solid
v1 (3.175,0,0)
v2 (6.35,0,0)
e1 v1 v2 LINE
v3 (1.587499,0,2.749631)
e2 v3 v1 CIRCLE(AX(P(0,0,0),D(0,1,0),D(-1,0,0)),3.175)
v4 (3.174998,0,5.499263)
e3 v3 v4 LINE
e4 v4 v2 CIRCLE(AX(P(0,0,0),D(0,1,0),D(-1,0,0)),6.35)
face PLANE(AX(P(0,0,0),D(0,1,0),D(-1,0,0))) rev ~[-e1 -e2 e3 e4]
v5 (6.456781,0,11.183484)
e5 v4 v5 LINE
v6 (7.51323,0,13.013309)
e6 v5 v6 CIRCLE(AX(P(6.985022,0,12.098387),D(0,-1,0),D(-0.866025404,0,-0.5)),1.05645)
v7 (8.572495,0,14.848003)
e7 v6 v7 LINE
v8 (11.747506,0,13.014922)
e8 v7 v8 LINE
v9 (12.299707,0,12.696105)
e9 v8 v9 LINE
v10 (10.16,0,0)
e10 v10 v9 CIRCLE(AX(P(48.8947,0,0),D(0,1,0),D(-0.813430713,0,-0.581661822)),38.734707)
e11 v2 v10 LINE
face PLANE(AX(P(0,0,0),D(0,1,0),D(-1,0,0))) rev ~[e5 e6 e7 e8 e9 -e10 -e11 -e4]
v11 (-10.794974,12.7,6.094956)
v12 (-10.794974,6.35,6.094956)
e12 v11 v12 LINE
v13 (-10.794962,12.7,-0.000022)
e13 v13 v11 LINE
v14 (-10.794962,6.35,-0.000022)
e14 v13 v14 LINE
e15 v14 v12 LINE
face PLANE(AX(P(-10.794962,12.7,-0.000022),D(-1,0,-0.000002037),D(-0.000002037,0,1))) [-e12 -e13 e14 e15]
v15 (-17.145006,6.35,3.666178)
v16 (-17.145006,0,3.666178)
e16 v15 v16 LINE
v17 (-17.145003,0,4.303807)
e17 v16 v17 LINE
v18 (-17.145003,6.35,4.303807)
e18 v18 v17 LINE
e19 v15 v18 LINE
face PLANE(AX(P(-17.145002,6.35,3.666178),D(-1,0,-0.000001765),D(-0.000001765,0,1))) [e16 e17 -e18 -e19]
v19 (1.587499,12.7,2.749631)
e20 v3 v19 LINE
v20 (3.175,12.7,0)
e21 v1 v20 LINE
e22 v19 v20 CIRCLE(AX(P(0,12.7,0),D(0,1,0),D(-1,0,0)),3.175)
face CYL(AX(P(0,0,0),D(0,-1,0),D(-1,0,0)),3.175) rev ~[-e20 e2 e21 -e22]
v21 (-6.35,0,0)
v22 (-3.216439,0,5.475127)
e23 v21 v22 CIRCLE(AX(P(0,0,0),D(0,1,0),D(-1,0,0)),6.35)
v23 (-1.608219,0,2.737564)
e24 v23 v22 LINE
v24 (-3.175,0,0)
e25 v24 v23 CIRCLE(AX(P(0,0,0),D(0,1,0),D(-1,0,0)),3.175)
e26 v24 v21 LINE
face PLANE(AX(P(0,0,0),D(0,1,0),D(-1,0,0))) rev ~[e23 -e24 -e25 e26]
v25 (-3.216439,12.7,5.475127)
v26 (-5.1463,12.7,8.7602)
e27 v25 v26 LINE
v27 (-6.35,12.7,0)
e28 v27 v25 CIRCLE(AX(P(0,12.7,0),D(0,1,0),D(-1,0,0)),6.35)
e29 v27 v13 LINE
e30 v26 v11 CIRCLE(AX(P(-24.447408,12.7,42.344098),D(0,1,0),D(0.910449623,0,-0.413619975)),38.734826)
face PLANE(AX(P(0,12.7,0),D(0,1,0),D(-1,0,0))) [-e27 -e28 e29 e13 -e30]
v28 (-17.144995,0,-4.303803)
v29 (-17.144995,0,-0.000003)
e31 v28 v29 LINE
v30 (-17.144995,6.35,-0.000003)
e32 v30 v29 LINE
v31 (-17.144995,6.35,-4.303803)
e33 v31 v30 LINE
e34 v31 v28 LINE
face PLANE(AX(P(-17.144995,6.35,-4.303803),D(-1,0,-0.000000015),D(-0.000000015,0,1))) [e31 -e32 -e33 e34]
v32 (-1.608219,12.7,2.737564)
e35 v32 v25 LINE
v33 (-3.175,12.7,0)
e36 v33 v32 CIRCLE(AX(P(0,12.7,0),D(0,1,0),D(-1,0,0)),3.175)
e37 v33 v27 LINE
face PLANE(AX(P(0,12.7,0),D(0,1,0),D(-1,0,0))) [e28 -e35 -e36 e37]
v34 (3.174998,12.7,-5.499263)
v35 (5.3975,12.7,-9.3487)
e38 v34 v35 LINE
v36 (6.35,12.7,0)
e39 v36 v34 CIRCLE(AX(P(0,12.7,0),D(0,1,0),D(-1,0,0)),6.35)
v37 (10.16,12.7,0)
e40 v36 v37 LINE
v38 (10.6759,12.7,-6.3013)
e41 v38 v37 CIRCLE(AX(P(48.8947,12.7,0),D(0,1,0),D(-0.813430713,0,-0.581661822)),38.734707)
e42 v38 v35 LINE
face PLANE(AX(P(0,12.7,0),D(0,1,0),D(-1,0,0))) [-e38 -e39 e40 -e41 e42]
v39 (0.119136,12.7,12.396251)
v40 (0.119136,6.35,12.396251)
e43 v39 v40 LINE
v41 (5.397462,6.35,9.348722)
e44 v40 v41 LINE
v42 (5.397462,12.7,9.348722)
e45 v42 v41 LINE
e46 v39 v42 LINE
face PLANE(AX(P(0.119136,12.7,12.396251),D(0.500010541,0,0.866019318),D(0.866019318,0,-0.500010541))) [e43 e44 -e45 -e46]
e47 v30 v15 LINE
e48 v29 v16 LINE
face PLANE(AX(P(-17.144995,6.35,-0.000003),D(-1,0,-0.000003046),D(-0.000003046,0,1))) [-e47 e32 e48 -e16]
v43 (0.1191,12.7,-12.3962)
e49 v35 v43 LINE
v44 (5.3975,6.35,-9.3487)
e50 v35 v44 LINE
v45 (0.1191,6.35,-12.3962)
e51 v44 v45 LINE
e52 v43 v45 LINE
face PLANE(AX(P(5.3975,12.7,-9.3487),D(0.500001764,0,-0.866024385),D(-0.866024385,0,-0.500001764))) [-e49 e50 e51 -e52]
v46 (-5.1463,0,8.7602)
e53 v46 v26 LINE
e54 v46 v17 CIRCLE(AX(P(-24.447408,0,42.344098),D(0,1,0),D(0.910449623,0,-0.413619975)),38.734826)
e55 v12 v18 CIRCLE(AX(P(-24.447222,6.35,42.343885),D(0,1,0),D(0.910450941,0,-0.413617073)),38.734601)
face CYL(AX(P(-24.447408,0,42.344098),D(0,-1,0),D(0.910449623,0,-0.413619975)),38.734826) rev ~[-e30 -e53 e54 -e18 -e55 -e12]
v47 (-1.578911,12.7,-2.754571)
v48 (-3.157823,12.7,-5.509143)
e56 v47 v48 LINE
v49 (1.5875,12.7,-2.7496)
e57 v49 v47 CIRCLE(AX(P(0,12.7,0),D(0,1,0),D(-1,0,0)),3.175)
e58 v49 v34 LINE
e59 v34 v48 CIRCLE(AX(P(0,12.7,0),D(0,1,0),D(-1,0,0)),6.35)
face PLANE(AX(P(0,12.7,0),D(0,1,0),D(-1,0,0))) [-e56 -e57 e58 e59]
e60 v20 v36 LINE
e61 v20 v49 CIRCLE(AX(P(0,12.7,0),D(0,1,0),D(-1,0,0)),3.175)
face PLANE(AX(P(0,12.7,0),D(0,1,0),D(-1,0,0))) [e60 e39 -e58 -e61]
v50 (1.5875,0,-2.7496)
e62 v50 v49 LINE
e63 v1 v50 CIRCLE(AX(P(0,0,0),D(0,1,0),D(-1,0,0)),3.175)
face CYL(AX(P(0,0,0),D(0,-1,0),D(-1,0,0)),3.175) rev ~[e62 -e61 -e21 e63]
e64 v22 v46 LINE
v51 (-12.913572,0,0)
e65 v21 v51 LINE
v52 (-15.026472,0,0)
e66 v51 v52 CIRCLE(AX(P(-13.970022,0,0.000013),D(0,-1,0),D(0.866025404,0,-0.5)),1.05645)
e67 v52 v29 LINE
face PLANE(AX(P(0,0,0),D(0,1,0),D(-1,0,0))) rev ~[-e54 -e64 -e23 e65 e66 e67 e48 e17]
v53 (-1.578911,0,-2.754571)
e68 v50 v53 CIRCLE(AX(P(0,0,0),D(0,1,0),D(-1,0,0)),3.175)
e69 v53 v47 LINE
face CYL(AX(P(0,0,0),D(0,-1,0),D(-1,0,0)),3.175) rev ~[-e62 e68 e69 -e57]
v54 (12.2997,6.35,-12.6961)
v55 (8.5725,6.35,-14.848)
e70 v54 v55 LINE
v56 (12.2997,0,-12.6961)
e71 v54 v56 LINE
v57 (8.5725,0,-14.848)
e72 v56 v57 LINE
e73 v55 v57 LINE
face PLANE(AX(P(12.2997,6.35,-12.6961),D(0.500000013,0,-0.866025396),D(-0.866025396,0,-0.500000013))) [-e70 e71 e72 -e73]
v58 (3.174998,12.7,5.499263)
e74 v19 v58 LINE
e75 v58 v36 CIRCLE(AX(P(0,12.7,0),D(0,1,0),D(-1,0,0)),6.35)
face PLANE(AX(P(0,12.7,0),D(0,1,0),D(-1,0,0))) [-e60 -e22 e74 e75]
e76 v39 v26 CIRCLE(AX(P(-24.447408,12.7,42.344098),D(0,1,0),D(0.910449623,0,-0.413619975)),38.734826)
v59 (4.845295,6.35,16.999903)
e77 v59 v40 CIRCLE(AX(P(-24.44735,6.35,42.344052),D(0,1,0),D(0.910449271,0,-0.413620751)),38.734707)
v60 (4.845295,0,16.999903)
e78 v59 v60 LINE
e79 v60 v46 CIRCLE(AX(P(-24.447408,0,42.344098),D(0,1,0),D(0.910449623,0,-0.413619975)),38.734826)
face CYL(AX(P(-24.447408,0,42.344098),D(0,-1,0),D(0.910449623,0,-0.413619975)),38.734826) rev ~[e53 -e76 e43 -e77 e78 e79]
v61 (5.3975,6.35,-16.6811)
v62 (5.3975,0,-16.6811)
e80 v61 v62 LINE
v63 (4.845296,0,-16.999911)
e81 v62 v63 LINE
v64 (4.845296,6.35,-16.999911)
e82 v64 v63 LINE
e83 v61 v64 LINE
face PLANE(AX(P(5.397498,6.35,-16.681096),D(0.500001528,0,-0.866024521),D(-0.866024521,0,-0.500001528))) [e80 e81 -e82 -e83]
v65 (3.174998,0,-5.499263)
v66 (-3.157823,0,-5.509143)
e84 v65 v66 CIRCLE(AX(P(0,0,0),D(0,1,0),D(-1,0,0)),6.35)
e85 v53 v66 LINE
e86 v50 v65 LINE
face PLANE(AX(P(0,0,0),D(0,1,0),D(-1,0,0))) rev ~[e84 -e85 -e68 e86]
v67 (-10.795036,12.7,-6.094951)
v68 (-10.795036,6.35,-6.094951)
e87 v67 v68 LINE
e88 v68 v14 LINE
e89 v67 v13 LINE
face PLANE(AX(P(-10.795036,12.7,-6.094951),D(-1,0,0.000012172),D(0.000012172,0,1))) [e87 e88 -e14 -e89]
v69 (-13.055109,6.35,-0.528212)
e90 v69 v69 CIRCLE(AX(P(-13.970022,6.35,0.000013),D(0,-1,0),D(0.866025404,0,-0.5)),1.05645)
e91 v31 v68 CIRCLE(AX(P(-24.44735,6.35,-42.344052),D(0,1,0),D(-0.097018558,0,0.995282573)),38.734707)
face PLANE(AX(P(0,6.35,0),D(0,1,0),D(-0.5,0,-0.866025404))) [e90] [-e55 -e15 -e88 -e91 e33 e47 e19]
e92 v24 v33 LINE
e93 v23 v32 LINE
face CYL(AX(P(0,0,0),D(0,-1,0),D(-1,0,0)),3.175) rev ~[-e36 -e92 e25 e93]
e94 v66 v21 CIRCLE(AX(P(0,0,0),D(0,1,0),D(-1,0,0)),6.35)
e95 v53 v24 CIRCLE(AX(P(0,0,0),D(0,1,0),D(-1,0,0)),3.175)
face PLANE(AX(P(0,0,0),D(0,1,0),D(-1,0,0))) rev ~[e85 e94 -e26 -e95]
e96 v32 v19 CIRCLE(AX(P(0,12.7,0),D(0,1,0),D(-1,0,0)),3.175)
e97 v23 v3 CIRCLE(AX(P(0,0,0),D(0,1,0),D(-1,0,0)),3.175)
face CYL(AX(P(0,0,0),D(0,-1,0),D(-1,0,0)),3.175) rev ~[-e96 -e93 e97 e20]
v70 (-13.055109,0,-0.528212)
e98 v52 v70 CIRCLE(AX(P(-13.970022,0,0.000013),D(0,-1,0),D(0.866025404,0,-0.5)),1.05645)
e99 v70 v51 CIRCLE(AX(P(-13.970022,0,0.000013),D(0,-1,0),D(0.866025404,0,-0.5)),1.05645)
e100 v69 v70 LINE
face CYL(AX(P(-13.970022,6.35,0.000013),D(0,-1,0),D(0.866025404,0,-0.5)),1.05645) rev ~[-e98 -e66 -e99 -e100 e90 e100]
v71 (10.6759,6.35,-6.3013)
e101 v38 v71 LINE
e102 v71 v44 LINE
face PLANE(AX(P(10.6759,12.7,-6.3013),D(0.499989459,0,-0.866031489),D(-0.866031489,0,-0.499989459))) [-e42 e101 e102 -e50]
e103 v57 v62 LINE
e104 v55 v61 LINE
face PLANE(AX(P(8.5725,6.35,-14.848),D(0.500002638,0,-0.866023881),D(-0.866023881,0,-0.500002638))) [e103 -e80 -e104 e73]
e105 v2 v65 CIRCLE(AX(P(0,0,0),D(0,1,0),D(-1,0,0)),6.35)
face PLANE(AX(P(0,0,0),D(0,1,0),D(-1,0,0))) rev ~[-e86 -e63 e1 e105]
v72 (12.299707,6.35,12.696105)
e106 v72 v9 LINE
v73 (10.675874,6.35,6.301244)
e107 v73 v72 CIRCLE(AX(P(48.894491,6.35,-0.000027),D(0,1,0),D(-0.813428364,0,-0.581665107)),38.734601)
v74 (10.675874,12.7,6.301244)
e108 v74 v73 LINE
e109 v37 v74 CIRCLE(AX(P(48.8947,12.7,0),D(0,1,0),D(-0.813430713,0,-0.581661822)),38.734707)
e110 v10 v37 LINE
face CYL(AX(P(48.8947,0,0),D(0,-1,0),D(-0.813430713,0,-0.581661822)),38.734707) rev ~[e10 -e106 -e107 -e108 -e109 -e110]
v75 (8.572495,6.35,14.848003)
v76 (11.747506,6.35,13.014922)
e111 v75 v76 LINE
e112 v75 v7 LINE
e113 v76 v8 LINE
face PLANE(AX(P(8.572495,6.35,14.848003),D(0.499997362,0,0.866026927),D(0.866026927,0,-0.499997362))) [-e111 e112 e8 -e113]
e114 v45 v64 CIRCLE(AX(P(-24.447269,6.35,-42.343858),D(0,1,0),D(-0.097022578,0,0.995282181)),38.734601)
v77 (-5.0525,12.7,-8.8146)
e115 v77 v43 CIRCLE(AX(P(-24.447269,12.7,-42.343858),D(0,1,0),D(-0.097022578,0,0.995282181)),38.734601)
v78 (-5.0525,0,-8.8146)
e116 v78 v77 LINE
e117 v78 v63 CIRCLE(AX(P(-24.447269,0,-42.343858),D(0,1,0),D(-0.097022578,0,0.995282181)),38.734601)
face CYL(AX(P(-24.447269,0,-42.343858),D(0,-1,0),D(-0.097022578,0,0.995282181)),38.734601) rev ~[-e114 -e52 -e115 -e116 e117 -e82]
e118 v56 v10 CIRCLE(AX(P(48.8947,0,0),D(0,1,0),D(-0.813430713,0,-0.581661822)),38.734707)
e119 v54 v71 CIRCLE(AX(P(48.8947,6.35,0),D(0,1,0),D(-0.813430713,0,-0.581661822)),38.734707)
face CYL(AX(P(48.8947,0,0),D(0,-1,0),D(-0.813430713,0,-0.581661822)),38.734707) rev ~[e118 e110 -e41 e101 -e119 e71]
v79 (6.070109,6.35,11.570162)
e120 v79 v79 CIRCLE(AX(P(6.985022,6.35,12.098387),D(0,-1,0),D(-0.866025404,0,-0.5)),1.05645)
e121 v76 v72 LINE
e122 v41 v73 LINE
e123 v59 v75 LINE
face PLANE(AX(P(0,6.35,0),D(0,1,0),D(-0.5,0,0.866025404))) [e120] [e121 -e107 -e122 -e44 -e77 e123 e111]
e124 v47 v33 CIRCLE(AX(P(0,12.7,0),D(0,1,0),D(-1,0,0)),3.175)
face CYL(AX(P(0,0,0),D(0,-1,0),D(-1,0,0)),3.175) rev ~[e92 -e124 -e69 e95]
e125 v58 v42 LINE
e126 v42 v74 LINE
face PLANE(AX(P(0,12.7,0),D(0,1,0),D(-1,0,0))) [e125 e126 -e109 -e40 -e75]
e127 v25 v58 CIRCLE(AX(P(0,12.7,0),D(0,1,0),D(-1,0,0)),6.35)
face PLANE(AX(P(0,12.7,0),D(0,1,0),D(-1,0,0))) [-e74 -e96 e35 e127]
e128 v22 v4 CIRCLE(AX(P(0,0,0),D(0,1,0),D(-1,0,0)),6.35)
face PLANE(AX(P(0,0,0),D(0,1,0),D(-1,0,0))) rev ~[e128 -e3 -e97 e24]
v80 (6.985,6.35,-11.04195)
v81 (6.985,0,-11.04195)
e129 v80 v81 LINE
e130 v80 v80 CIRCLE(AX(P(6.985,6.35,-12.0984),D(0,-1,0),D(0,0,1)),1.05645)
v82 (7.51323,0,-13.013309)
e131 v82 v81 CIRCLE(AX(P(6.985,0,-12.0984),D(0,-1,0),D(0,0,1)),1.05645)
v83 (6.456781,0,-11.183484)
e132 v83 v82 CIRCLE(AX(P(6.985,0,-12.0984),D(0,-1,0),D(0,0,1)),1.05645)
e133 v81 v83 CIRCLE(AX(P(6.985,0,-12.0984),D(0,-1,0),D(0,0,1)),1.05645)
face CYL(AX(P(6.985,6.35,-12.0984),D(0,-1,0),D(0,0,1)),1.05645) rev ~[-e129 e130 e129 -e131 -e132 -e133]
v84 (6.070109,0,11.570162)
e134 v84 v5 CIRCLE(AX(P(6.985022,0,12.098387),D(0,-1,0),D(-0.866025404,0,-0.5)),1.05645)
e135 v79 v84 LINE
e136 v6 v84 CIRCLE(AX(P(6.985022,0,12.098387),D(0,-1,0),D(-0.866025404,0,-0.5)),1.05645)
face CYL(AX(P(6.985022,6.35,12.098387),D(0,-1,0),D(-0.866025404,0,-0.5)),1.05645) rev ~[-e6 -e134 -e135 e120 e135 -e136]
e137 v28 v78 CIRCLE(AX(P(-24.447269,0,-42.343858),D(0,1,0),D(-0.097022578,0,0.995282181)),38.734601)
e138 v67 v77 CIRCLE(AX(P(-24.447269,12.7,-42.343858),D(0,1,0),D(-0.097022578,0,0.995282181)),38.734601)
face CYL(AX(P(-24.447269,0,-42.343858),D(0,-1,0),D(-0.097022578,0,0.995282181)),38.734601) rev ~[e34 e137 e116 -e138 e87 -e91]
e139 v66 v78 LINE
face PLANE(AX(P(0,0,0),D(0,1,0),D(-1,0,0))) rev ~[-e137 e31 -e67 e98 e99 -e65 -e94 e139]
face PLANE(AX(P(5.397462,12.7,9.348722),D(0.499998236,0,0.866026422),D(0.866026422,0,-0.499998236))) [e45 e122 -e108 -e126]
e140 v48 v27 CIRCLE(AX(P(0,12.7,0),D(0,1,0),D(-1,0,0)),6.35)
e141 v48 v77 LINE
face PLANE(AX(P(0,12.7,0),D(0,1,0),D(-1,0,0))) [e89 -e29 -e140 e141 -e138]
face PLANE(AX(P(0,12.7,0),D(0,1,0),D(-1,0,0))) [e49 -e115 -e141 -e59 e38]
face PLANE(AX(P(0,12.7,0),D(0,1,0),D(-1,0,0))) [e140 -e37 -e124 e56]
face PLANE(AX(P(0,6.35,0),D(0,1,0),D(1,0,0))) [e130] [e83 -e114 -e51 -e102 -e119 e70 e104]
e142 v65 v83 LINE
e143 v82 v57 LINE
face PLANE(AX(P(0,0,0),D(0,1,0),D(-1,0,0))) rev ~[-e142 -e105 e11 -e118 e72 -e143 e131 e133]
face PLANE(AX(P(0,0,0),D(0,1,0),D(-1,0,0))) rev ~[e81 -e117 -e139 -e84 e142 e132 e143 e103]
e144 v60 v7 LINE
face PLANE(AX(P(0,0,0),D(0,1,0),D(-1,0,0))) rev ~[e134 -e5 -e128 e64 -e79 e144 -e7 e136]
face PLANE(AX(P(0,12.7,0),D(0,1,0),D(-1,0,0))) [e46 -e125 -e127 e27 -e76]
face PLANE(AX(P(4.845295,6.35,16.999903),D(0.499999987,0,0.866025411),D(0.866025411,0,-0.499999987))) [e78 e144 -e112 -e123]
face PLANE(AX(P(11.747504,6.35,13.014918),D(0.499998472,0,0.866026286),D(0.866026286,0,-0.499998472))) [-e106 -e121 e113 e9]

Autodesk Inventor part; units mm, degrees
ref_plane "YZ Plane" through (0, 0, 0) normal (1, 0, 0) x (0, 1, 0)
ref_plane "XZ Plane" through (0, 0, 0) normal (0, 1, 0) x (-1, 0, 0)
ref_plane "XY Plane" through (0, 0, 0) normal (0, 0, 1) x (1, 0, 0)
sketch "Sketch1" plane through (0, 0, 0) normal (0, 1, 0) x (-1, 0, 0)
  line L0 (0, 0) -> (28.575, 0)
  line L1 (28.575, 0) -> (0, 0)
  line L2 (0, 0) -> (-14.2875, -24.7467)
  line L3 (0, 0) -> (28.575, 0) construction
  line L4 (0, 0) -> (-14.2875, 24.7467)
  line L5 (0, 0) -> (28.575, 0) construction
  circle A0 centre (28.575, 0) radius 2.54
  circle A1 centre (-14.2875, -24.7467) radius 2.54
  circle A2 centre (-14.2875, 24.7467) radius 2.54
  circle A3 centre (0, 0) radius 3.175
  circle A4 centre (0, 0) radius 6.35
  line L6 (-1.5875, -2.7496) -> (0, 0)
  line L7 (0, 0) -> (-6.35, 0)
  circle A5 centre (-14.2875, 24.7467) radius 3.81
  circle A6 centre (28.575, 0) radius 3.81
  circle A7 centre (-14.2875, -24.7467) radius 3.81
  line L8 (30.6811, 3.175) -> (-12.1814, 27.9217)
  line L9 (28.2054, -3.792) -> (-10.8187, -26.3226)
  line L10 (-18.0975, 24.7467) -> (-18.0975, -24.7467)
  line L11 (0, 0) -> (5.0525, -8.8146)
  line L12 (0, 0) -> (5.1463, 8.7602)
  line L13 (0, 0) -> (-10.16, 0)
  arc A8 (28.2054, -3.792) -> (-10.8187, -26.3226) centre (24.4473, -42.344) ccw
  arc A9 (-10.8187, 26.3226) -> (28.2054, 3.792) centre (24.4473, 42.344) ccw
  arc A10 (-17.3867, -22.5305) -> (-17.3867, 22.5305) centre (-48.8947, 0) ccw
  point P0 (5.1074, 8.7829)
  point P1 (-10.16, 0.0317)
  point P2 (30.2716, 3.4114)
  point P3 (28.2054, 3.792)
  point P4 (-10.8187, 26.3226)
  point P5 (-17.3867, 22.5305)
  point P6 (-17.3867, -22.5305)
  dimension "d9" = 6.35
  dimension "d41" = 12.7
  dimension "d0" = 28.575
  dimension "d1" = 28.575
  dimension "d2" = 120
  dimension "d3" = 28.575
  dimension "d4" = 120
  dimension "d5" = 5.08
  dimension "d6" = 5.08
  dimension "d7" = 5.08
  dimension "d42" = 7.62
  dimension "d43" = 7.62
  dimension "d44" = 7.62
  dimension "d47" = 10.16
  dimension "d48" = 10.16
  dimension "d49" = 10.16
  dimension "d52" = 360
extrude "Extrusion4" add sketch "Sketch1" along normal blind 12.7 contours A3 L12 A4 L0 | L0 A4 L11 A3 | A3 L11 A4 L2 | L2 A4 L7 A3 | A3 L7 A4 L4 | L4 A4 L12 A3 | A4 L12 A9 A6 L0 | L0 A6 A8 L11 A4 | A4 L11 A8 A7 L2 | L2 A7 A10 L13 A4 | A4 L13 A10 A5 L4 | L4 A5 A9 L12 A4 | A6 L8 | A7 | A5 picked at (31.8987, 0.5122)
sketch "Sketch19" plane through (0, 12.7, 0) normal (0, 1, 0) x (1, 0, 0)
  arc A0 (17.3867, 22.5305) -> (10.8187, 26.3226) centre (14.2875, 24.7467) ccw projected
  line L0 (5.3975, 9.3487) -> (0.1191, 12.3962) projected
  arc A1 (-28.2054, 3.792) -> (10.8187, 26.3226) centre (-24.4473, 42.344) ccw projected
  arc A2 (-28.2054, 3.792) -> (-30.6811, -3.175) centre (-28.575, 0) ccw projected
  line L1 (-30.6811, -3.175) -> (-30.2716, -3.4114) projected
  arc A3 (-30.2716, -3.4114) -> (-28.2054, -3.792) centre (-28.575, 0) ccw projected
  arc A4 (10.8187, -26.3226) -> (-28.2054, -3.792) centre (-24.4473, -42.344) ccw projected
  arc A5 (10.8187, -26.3226) -> (17.3867, -22.5305) centre (14.2875, -24.7467) ccw projected
  arc A6 (17.3867, 22.5305) -> (17.3867, -22.5305) centre (48.8947, 0) ccw projected
  arc A7 (17.3867, 22.5305) -> (10.8187, 26.3226) centre (14.2875, 24.7467) ccw projected
  circle A8 centre (-28.575, 0) radius 2.54 projected
  circle A9 centre (0, 0) radius 3.175 projected
  circle A10 centre (14.2875, -24.7467) radius 2.54 projected
  circle A11 centre (14.2875, 24.7467) radius 2.54 projected
  line L2 (10.6759, 6.3013) -> (5.3975, 9.3487) projected
  arc A12 (-28.2054, 3.792) -> (10.8187, 26.3226) centre (-24.4473, 42.344) ccw projected
  point P0 (17.3867, 22.5305)
  point P1 (10.8187, 26.3226)
  point P2 (0.1191, 12.3962)
extrude "Extrusion9" cut sketch "Sketch19" against normal blind 6.35 contours A6 L2 L0 A1 A0
sketch "Sketch20" plane through (0, 6.35, 0) normal (0, 1, 0) x (1, 0, 0)
  line L0 (0, 0) -> (5.3975, 9.3487)
  line L1 (10.6759, 6.3013) -> (0.1191, 12.3962) projected
  line L2 (5.3975, 9.3487) -> (8.5725, 14.848)
  line L3 (8.5725, 14.848) -> (5.3975, 16.6811)
  line L4 (5.3975, 16.6811) -> (8.5725, 14.848)
  arc A0 (17.3867, 22.5305) -> (17.3867, -22.5305) centre (48.8947, 0) ccw projected
  line L5 (12.2997, 12.6961) -> (8.5725, 14.848)
  arc A1 (0.1191, 12.3962) -> (10.8187, 26.3226) centre (-24.4473, 42.344) ccw projected
  arc A2 (17.3867, 22.5305) -> (10.8187, 26.3226) centre (14.2875, 24.7467) ccw projected
  line L6 (8.5725, 14.848) -> (4.3283, 17.2984)
  point P0 (4.8453, 16.9999)
  dimension "d113" = 6.35
extrude "Extrusion10" cut sketch "Sketch20" against normal blind 6.35 contours L5 L3 L6 A1 A2 A0
pattern_circular "Circular Pattern2" count 3 over 360 about axis through (0, 0, 0) along (0, 1, 0) of "Extrusion9", "Extrusion10"
sketch "Sketch21" plane through (0, 12.7, 0) normal (0, 1, 0) x (1, 0, 0)
  point P0 (0, 0)
sketch "Sketch22" plane through (0, 6.35, 0) normal (0, 1, 0) x (1, 0, 0)
  line L0 (0, 0) -> (8.5725, 14.848)
  line L1 (4.8453, 16.9999) -> (12.2997, 12.6961) projected
  line L2 (10.6759, 6.3013) -> (0.1191, 12.3962) projected
  line L3 (5.3975, 9.3487) -> (8.5725, 14.848)
  line L4 (5.3975, 9.3487) -> (6.985, 12.0984)
  arc A0 (0.1191, 12.3962) -> (4.8453, 16.9999) centre (-24.4473, 42.344) ccw projected
  line L5 (2.6088, 14.625) -> (6.985, 12.0984)
  line L6 (6.985, 12.0984) -> (11.3612, 9.5718)
  arc A1 (12.2997, 12.6961) -> (12.2997, -12.6961) centre (48.8947, 0) ccw projected
hole "Hole8" at (6.985, 6.35, -12.0984) direction (0, -1, 0) diameter 2.1129 depth 7.7978 thread size "M2.6x0.45" class "6H" standard "ISO Metric profile"
pattern_circular "Circular Pattern3" count 3 over 360 about axis through (0, 0, 0) along (0, 1, 0) of "Hole8"
properties part number "stability copy"
